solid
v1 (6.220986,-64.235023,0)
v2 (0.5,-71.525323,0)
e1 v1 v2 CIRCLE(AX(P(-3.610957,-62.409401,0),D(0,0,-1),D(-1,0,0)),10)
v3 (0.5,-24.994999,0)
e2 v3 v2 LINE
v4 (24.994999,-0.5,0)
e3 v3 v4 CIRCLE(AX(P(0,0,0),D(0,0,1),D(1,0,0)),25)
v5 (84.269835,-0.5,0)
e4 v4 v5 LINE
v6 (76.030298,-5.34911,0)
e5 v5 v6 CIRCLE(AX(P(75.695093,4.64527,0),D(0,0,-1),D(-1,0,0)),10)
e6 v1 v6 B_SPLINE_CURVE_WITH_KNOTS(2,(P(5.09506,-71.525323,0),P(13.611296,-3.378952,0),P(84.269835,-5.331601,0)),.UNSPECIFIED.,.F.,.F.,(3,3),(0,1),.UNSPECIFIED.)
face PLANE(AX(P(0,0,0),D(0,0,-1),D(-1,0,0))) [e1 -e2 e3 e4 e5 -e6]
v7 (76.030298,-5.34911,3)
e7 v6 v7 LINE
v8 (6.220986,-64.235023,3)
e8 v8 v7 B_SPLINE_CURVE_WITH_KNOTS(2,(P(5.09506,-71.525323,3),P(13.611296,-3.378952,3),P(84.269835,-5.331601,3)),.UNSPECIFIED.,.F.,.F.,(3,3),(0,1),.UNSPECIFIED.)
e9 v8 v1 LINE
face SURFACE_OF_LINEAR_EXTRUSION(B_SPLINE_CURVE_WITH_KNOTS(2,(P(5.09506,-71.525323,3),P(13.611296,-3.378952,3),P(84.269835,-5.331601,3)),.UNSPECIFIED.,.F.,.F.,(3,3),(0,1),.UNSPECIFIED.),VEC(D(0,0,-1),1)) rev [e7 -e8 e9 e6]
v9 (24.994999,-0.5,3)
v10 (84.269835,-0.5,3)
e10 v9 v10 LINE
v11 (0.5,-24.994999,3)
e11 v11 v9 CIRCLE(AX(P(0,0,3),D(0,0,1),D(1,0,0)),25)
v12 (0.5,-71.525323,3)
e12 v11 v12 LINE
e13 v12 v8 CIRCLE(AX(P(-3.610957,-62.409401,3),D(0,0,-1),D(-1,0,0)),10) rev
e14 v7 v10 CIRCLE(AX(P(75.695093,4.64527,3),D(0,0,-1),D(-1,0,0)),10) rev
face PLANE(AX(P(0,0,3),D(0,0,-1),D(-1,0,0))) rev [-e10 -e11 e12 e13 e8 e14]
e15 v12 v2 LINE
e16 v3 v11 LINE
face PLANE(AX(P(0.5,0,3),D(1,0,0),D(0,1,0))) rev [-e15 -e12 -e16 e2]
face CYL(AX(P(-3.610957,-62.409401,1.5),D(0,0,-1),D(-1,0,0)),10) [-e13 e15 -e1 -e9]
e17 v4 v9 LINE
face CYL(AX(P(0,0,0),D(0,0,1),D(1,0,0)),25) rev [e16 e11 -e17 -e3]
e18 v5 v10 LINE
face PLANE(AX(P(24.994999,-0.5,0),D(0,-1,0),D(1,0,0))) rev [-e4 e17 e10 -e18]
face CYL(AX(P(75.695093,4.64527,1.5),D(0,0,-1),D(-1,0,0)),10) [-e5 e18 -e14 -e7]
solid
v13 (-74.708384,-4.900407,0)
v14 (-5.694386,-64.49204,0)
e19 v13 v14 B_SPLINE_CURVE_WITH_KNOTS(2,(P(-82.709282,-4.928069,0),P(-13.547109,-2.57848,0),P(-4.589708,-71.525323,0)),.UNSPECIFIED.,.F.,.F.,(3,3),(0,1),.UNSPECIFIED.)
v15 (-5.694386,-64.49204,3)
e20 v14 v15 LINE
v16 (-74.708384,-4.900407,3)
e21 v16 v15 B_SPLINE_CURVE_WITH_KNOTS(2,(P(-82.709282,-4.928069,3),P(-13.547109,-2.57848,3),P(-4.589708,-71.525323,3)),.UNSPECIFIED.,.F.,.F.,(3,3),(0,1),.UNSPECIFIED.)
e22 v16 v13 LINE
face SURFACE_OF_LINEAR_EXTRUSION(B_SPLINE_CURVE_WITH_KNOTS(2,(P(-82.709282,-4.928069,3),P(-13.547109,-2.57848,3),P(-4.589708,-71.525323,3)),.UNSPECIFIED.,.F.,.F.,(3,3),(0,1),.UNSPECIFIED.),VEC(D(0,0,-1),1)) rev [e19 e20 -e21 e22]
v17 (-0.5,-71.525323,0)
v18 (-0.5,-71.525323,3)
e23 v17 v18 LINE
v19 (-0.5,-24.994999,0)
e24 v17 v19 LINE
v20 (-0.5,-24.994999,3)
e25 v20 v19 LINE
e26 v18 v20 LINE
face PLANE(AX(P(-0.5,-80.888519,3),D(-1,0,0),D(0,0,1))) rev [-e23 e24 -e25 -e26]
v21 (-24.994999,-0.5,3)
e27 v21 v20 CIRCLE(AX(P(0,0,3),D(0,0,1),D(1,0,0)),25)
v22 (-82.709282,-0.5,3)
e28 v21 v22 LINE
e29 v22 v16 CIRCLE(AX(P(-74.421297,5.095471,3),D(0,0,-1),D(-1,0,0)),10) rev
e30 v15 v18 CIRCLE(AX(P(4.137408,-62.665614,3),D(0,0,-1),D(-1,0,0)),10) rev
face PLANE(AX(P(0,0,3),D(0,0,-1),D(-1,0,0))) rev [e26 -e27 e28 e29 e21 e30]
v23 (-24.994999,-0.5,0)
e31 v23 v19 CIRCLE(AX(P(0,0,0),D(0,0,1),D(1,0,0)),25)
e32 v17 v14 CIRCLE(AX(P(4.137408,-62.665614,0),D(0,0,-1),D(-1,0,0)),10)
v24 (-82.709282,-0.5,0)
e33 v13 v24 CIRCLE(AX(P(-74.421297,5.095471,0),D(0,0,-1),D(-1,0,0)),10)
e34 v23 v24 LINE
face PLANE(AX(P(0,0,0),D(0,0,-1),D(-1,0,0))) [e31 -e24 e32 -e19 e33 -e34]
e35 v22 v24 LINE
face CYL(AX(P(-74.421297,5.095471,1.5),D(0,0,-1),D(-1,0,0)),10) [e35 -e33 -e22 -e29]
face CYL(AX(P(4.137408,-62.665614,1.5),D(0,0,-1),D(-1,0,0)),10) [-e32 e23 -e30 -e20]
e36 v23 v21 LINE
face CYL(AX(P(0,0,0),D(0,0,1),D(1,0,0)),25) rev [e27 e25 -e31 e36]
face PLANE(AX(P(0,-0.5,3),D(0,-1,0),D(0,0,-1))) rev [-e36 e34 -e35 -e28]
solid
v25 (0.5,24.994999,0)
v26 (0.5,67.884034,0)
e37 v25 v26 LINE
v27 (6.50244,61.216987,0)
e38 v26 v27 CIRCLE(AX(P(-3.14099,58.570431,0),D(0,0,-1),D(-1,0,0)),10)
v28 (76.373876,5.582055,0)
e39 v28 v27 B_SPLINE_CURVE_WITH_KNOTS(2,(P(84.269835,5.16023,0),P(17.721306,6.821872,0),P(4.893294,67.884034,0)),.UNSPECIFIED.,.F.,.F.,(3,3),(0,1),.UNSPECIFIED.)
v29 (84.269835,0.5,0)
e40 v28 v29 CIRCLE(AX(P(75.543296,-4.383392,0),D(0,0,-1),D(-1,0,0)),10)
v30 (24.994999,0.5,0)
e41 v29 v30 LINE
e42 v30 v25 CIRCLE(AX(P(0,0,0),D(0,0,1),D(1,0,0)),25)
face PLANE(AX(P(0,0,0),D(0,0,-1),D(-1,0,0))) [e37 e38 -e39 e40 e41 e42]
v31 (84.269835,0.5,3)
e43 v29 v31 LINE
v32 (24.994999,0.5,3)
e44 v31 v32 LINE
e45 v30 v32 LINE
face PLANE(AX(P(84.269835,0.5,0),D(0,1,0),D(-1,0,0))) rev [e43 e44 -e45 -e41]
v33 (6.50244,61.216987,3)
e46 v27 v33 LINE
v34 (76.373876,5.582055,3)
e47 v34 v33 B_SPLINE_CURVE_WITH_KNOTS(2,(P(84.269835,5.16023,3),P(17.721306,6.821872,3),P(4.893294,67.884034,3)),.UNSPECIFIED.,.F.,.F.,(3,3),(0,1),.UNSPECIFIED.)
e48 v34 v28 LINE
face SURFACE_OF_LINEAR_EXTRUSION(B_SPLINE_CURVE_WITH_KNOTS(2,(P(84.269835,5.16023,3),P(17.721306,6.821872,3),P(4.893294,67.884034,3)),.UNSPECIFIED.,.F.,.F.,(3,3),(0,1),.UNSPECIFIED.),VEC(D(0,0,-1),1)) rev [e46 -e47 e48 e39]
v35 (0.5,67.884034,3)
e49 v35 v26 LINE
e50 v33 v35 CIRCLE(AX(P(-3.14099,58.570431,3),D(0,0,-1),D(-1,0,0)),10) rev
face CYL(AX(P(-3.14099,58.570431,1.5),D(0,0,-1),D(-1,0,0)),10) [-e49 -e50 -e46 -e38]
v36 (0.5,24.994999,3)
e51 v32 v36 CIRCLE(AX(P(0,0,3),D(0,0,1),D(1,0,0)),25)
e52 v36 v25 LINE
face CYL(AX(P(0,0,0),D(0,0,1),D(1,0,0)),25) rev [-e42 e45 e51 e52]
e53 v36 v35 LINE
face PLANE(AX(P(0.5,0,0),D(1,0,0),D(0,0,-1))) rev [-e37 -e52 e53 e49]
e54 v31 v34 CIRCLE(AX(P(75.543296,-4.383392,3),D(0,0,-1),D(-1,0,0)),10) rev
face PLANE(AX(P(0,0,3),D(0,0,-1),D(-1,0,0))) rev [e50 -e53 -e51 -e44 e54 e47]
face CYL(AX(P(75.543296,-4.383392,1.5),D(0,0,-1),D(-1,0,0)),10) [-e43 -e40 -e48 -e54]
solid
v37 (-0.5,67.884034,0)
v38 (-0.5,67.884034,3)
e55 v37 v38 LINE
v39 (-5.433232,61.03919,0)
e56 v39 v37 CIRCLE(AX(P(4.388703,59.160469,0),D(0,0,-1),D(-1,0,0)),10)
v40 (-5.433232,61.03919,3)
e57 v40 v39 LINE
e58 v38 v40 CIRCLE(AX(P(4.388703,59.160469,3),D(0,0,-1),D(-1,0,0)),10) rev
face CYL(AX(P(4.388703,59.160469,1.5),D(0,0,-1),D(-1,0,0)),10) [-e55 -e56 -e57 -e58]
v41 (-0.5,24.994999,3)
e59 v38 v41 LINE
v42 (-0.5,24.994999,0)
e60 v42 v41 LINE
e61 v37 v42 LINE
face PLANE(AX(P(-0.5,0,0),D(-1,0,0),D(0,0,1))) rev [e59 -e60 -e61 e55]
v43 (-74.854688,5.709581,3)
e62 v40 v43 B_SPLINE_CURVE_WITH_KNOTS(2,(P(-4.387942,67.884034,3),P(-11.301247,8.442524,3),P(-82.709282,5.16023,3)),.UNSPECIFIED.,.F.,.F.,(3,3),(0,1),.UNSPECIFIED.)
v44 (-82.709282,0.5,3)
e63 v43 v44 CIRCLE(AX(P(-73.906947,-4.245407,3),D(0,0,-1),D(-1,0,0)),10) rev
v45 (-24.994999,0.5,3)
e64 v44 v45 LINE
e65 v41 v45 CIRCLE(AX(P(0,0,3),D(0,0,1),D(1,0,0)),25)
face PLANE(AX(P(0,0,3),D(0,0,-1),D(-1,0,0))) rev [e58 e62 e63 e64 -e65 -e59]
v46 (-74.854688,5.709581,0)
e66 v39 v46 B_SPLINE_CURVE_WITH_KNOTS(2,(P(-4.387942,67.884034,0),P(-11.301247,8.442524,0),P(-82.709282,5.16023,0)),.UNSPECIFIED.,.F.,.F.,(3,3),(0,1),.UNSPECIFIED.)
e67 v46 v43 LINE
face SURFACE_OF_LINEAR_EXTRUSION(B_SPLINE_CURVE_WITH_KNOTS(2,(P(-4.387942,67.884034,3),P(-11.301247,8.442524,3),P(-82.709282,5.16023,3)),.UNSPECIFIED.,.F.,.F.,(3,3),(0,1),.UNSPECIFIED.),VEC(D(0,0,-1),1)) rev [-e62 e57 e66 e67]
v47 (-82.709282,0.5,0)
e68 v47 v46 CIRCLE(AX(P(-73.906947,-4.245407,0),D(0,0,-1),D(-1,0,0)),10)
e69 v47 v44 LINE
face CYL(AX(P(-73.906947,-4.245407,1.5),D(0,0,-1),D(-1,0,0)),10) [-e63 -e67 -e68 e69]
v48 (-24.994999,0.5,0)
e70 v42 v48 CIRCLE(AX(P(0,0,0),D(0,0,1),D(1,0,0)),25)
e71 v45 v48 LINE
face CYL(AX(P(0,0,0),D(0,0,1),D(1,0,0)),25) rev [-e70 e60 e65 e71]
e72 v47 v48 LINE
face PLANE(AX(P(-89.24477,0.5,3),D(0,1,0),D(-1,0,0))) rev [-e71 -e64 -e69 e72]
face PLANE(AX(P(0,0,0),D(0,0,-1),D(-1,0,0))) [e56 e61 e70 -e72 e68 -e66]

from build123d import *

# Parameters (mm, degrees)
ESBO_O2_W                = 166.979117491
ESBO_O2_H                = 139.409356659
RESSALTO_EXTRUS_O1_DEPTH = 3
ESBO_O3_R                = 25
CORTE_EXTRUS_O1_DEPTH    = 3
CORTE_EXTRUS_O2_DEPTH    = 3
CORTE_EXTRUS_O3_DEPTH    = 3
CORTE_EXTRUS_O4_DEPTH    = 3
CORTE_EXTRUS_O5_DEPTH    = 3
CORTE_EXTRUS_O6_DEPTH    = 3
CORTE_EXTRUS_O7_DEPTH    = 3
CORTE_EXTRUS_O8_DEPTH    = 3
CORTE_EXTRUS_O9_DEPTH    = 3
FILETE1_R                = 10
FILETE2_R                = 10
FILETE3_R                = 10
FILETE4_R                = 10
FILETE5_R                = 10
FILETE6_R                = 10
FILETE7_R                = 10
FILETE8_R                = 10


with BuildPart() as part:
    # Esboço2 → Ressalto-extrusão1 (new body)
    with BuildSketch(Plane.XY):
        with Locations((0.78027625, -1.820644584)):
            Rectangle(ESBO_O2_W, ESBO_O2_H)
    extrude(amount=RESSALTO_EXTRUS_O1_DEPTH)

    # Esboço3 → Corte-extrusão1 (cut)
    with BuildSketch(Plane.XY.offset(3)):
        Circle(ESBO_O3_R)
    extrude(amount=-CORTE_EXTRUS_O1_DEPTH, mode=Mode.SUBTRACT)

    # Esboço4 → Corte-extrusão2 (cut)
    with BuildSketch(Plane.XY.offset(3)):
        Polygon((84.269834995, 0), (84.269834995, 0.5), (24.9949995, 0.5), (25, 0), (24.9949995, -0.5), (84.269834995, -0.5), align=None)
    extrude(amount=-CORTE_EXTRUS_O2_DEPTH, mode=Mode.SUBTRACT)

    # Esboço5 → Corte-extrusão3 (cut)
    with BuildSketch(Plane.XY.offset(3)):
        Polygon((0, 0), (0.5, 0), (0.5, 86.777510053), (-0.5, 86.782496688), (-0.5, 0), align=None)
    extrude(amount=-CORTE_EXTRUS_O3_DEPTH, mode=Mode.SUBTRACT)


with BuildPart() as corte_extrus_o3_piece_1:
    # of the separate pieces the step leaves, piece 1, a body of its own (corte_extrus_o3_pieces)
    add(part.part.solids().sort_by_distance((-82.709282496, 67.884033746, 0))[0])

    # Esboço6 → Corte-extrusão4 (cut)
    with BuildSketch(Plane(origin=(0, 0, 0), x_dir=(-1, 0, 0), z_dir=(0, 0, -1))):
        Polygon((89.244769548, 0), (89.244769548, 0.5), (0, 0.5), (0, 0), (0, -0.5), (89.244769548, -0.5), align=None)
    extrude(amount=-CORTE_EXTRUS_O4_DEPTH, mode=Mode.SUBTRACT)


with BuildPart() as corte_extrus_o3_piece_2:
    # of the separate pieces the step leaves, piece 2, a body of its own (corte_extrus_o3_pieces)
    add(part.part.solids().sort_by_distance((0.5, 67.884033746, 0))[0])

    # Esboço10 → Corte-extrusão8 (cut)
    with BuildSketch(Plane(origin=(0, 0, 0), x_dir=(-1, 0, 0), z_dir=(0, 0, -1))):
        with BuildLine():
            Line((-84.269834995, 5.160229699), (-84.269834995, 67.884033746))
            Line((-84.269834995, 67.884033746), (-4.893293559, 67.884033746))
            add(Edge.make_bspline(
                [(-4.893293559, 67.884033746), (-17.721306454, 6.821872092), (-84.269834995, 5.160229699)],
                knots=[0, 0, 0, 1, 1, 1], degree=2))
        make_face()
    extrude(amount=-CORTE_EXTRUS_O8_DEPTH, mode=Mode.SUBTRACT)

    # Filete1
    # the kernel refuses this fillet: 10 mm, written as the material it takes off along each edge
    with BuildSketch(Plane(origin=(4.893293559, 67.884033746, -17.146220103), x_dir=(-1, 0, 0), z_dir=(0, 0, 1))) as filete1_piece_1:
        with BuildLine():
            CenterArc((8.0342839, 9.313602382), FILETE1_R, 195.346489623, 53.301364135)
            Line((-1.609146052, 6.667046362), (-1.802014651, 6.614115242))
            ThreePointArc((-1.802014651, 6.614115242), (-0.948362714, 3.298866295), (-0.195727502, -0.041118671))
            Line((-0.195727502, -0.041118671), (0, -0.2))
            ThreePointArc((0, -0.2), (2.19664678, -0.2), (4.320473752, -0.186272048))
            Line((4.320473752, -0.186272048), (4.393293559, 0))
        make_face()
    extrude(amount=37.292440207, mode=Mode.SUBTRACT)

    # Filete7
    # the kernel refuses this fillet: 10 mm, written as the material it takes off along each edge
    with BuildSketch(Plane(origin=(84.269834995, 5.160229699, -19.768046081), x_dir=(0, -1, 0), z_dir=(0, 0, 1))) as filete7_piece_1:
        with BuildLine():
            CenterArc((9.543622168, -8.726538718), FILETE7_R, 119.231483424, 56.004156117)
            Line((-0.421824995, -7.895958904), (-0.621133939, -7.879347308))
            ThreePointArc((-0.621133939, -7.879347308), (-0.353220789, -3.940425936), (-0.199937685, 0.004992221))
            Line((-0.199937685, 0.004992221), (0, 0.2))
            ThreePointArc((0, 0.2), (2.33011485, 0.2), (4.56256185, 0.174530774))
            Line((4.56256185, 0.174530774), (4.660229699, 0))
        make_face()
    extrude(amount=42.536092163, mode=Mode.SUBTRACT)


with BuildPart() as corte_extrus_o4_piece_1:
    # of the separate pieces the step leaves, piece 1, a body of its own (corte_extrus_o4_pieces)
    add(corte_extrus_o3_piece_1.part.solids().sort_by_distance((84.269834995, -0.5, 0))[0])

    # Esboço7 → Corte-extrusão5 (cut)
    with BuildSketch(Plane(origin=(0, 0, 0), x_dir=(-1, 0, 0), z_dir=(0, 0, -1))):
        Polygon((0, -80.888519278), (0.5, -80.888519278), (0.5, 0), (0, 0), (-0.5, 0), (-0.5, -80.888519278), align=None)
    extrude(amount=-CORTE_EXTRUS_O5_DEPTH, mode=Mode.SUBTRACT)


with BuildPart() as corte_extrus_o4_piece_2:
    # of the separate pieces the step leaves, piece 2, a body of its own (corte_extrus_o4_pieces)
    add(corte_extrus_o3_piece_1.part.solids().sort_by_distance((-82.709282496, 67.884033746, 0))[0])

    # Esboço8 → Corte-extrusão6 (cut)
    with BuildSketch(Plane(origin=(0, 0, 0), x_dir=(-1, 0, 0), z_dir=(0, 0, -1))):
        with BuildLine():
            Line((4.387941703, 67.884033746), (82.709282496, 67.884033746))
            Line((82.709282496, 67.884033746), (82.709282496, 5.160229699))
            add(Edge.make_bspline(
                [(4.387941703, 67.884033746), (11.301247028, 8.442524073), (82.709282496, 5.160229699)],
                knots=[0, 0, 0, 1, 1, 1], degree=2))
        make_face()
    extrude(amount=-CORTE_EXTRUS_O6_DEPTH, mode=Mode.SUBTRACT)

    # Filete2
    # the kernel refuses this fillet: 10 mm, written as the material it takes off along each edge
    with BuildSketch(Plane(origin=(-4.387941703, 67.884033746, -17.310494796), x_dir=(1, 0, 0), z_dir=(0, 0, 1))) as filete2_piece_1:
        with BuildLine():
            CenterArc((8.776644573, -8.723564882), FILETE2_R, 119.266355834, 49.905014541)
            Line((-1.045290399, -6.844843665), (-1.241729098, -6.807269241))
            ThreePointArc((-1.241729098, -6.807269241), (-0.657736165, -3.401850509), (-0.1986609, 0.023105124))
            Line((-0.1986609, 0.023105124), (0, 0.2))
            ThreePointArc((0, 0.2), (1.943970851, 0.2), (3.790167645, 0.174471298))
            Line((3.790167645, 0.174471298), (3.887941703, 0))
        make_face()
    extrude(amount=37.620989593, mode=Mode.SUBTRACT)

    # Filete3
    # the kernel refuses this fillet: 10 mm, written as the material it takes off along each edge
    with BuildSketch(Plane(origin=(-82.709282496, 5.160229699, -19.684454041), x_dir=(0.9975631232037131, 0.06976972999842818, 0), z_dir=(0, 0, 1))) as filete3_piece_1:
        with BuildLine():
            CenterArc((8.124656882, -9.996852585), FILETE3_R, 91.437560213, 56.232231285)
            Line((-0.325142968, -4.648873294), (-0.494138965, -4.541913708))
            ThreePointArc((-0.494138965, -4.541913708), (-0.362084109, -2.310482701), (-0.199512625, 0.013953946))
            Line((-0.199512625, 0.013953946), (0.004778236, 0.199942913))
            ThreePointArc((0.004778236, 0.199942913), (3.936936221, 0.151815551), (7.868764111, 0.199937052))
            Line((7.868764111, 0.199937052), (7.873781616, 0))
        make_face()
    extrude(amount=42.368908082, mode=Mode.SUBTRACT)


with BuildPart() as corte_extrus_o5_piece_1:
    # of the separate pieces the step leaves, piece 1, a body of its own (corte_extrus_o5_pieces)
    add(corte_extrus_o4_piece_1.part.solids().sort_by_distance((24.9949995, -0.5, 0))[0])

    # Esboço11 → Corte-extrusão9 (cut)
    with BuildSketch(Plane(origin=(0, 0, 0), x_dir=(-1, 0, 0), z_dir=(0, 0, -1))):
        with BuildLine():
            Line((-84.269834995, -71.525322913), (-84.269834995, -5.331601466))
            add(Edge.make_bspline(
                [(-84.269834995, -5.331601466), (-13.611295534, -3.378951706), (-5.095059543, -71.525322913)],
                knots=[0, 0, 0, 1, 1, 1], degree=2))
            Line((-5.095059543, -71.525322913), (-84.269834995, -71.525322913))
        make_face()
    extrude(amount=-CORTE_EXTRUS_O9_DEPTH, mode=Mode.SUBTRACT)

    # Filete6
    # the kernel refuses this fillet: 10 mm, written as the material it takes off along each edge
    with BuildSketch(Plane(origin=(5.095059543, -71.525322913, -18.441831117), x_dir=(-1, 0, 0), z_dir=(0, 0, 1))) as filete6_piece_1:
        with BuildLine():
            CenterArc((8.706016547, -9.115921923), FILETE6_R, 114.273683589, 55.207279263)
            Line((-1.125926489, -7.290299797), (-1.322565349, -7.253787355))
            ThreePointArc((-1.322565349, -7.253787355), (-0.706643901, -3.623013128), (-0.198456314, 0.024801039))
            Line((-0.198456314, 0.024801039), (0, 0.2))
            ThreePointArc((0, 0.2), (2.297529772, 0.2), (4.512840403, 0.182318438))
            Line((4.512840403, 0.182318438), (4.595059543, 0))
        make_face()
    extrude(amount=39.883662235, mode=Mode.SUBTRACT)

    # Filete8
    # the kernel refuses this fillet: 10 mm, written as the material it takes off along each edge
    with BuildSketch(Plane(origin=(84.269834995, -5.331601466, -20.598889075), x_dir=(-0.9999977423526359, -0.002124921088259069, 0), z_dir=(0, 0, 1))) as filete8_piece_1:
        with BuildLine():
            CenterArc((8.55352209, -9.995070038), FILETE8_R, 91.799190978, 57.113212686)
            Line((-0.010266772, -4.831590558), (-0.181542549, -4.728320969))
            ThreePointArc((-0.181542549, -4.728320969), (-0.205132934, -2.415370295), (-0.199999548, 0.000424984))
            Line((-0.199999548, 0.000424984), (0.005949703, 0.199911483))
            ThreePointArc((0.005949703, 0.199911483), (4.119834318, 0.137051672), (8.233276301, 0.199901401))
            Line((8.233276301, 0.199901401), (8.23955563, 0))
        make_face()
    extrude(amount=44.197778151, mode=Mode.SUBTRACT)


with BuildPart() as corte_extrus_o5_piece_2:
    # of the separate pieces the step leaves, piece 2, a body of its own (corte_extrus_o5_pieces)
    add(corte_extrus_o4_piece_1.part.solids().sort_by_distance((-0.5, -71.525322913, 0))[0])

    # Esboço9 → Corte-extrusão7 (cut)
    with BuildSketch(Plane(origin=(0, 0, 0), x_dir=(-1, 0, 0), z_dir=(0, 0, -1))):
        with BuildLine():
            Line((4.589707687, -71.525322913), (82.709282496, -71.525322913))
            Line((82.709282496, -71.525322913), (82.709282496, -4.928069498))
            add(Edge.make_bspline(
                [(82.709282496, -4.928069498), (13.547108577, -2.57847969), (4.589707687, -71.525322913)],
                knots=[0, 0, 0, 1, 1, 1], degree=2))
        make_face()
    extrude(amount=-CORTE_EXTRUS_O7_DEPTH, mode=Mode.SUBTRACT)

    # Filete4
    # the kernel refuses this fillet: 10 mm, written as the material it takes off along each edge
    with BuildSketch(Plane(origin=(-82.709282496, -4.928069498, -20.002365222), x_dir=(0, 1, 0), z_dir=(0, 0, 1))) as filete4_piece_1:
        with BuildLine():
            CenterArc((10.023540315, -8.287985663), FILETE4_R, 124.024481206, 54.330403162)
            Line((0.027662123, -8.00089827), (-0.172255441, -7.995156522))
            ThreePointArc((-0.172255441, -7.995156522), (-0.123523727, -4.000981323), (-0.199884689, -0.006790519))
            Line((-0.199884689, -0.006790519), (0, 0.2))
            ThreePointArc((0, 0.2), (2.214034749, 0.2), (4.316160082, 0.165759713))
            Line((4.316160082, 0.165759713), (4.428069498, 0))
        make_face()
    extrude(amount=43.004730443, mode=Mode.SUBTRACT)

    # Filete5
    # the kernel refuses this fillet: 10 mm, written as the material it takes off along each edge
    with BuildSketch(Plane(origin=(-4.589707687, -71.525322913, -17.798769098), x_dir=(-0.15516216323677826, 0.9878890135534879, 0), z_dir=(0, 0, 1))) as filete5_piece_1:
        with BuildLine():
            CenterArc((7.398291321, -9.996113228), FILETE5_R, 91.597519815, 51.847520572)
            Line((-0.634567892, -4.040177292), (-0.795225076, -3.921058574))
            ThreePointArc((-0.795225076, -3.921058574), (-0.514861749, -1.989056213), (-0.197577803, 0.031032433))
            Line((-0.197577803, 0.031032433), (0.00531892, 0.19992926))
            ThreePointArc((0.00531892, 0.19992926), (3.559802479, 0.151538096), (7.113931966, 0.199922265))
            Line((7.113931966, 0.199922265), (7.119507639, 0))
        make_face()
    extrude(amount=38.597538197, mode=Mode.SUBTRACT)


solid = Compound([corte_extrus_o3_piece_2.part, corte_extrus_o4_piece_2.part, corte_extrus_o5_piece_1.part, corte_extrus_o5_piece_2.part])
